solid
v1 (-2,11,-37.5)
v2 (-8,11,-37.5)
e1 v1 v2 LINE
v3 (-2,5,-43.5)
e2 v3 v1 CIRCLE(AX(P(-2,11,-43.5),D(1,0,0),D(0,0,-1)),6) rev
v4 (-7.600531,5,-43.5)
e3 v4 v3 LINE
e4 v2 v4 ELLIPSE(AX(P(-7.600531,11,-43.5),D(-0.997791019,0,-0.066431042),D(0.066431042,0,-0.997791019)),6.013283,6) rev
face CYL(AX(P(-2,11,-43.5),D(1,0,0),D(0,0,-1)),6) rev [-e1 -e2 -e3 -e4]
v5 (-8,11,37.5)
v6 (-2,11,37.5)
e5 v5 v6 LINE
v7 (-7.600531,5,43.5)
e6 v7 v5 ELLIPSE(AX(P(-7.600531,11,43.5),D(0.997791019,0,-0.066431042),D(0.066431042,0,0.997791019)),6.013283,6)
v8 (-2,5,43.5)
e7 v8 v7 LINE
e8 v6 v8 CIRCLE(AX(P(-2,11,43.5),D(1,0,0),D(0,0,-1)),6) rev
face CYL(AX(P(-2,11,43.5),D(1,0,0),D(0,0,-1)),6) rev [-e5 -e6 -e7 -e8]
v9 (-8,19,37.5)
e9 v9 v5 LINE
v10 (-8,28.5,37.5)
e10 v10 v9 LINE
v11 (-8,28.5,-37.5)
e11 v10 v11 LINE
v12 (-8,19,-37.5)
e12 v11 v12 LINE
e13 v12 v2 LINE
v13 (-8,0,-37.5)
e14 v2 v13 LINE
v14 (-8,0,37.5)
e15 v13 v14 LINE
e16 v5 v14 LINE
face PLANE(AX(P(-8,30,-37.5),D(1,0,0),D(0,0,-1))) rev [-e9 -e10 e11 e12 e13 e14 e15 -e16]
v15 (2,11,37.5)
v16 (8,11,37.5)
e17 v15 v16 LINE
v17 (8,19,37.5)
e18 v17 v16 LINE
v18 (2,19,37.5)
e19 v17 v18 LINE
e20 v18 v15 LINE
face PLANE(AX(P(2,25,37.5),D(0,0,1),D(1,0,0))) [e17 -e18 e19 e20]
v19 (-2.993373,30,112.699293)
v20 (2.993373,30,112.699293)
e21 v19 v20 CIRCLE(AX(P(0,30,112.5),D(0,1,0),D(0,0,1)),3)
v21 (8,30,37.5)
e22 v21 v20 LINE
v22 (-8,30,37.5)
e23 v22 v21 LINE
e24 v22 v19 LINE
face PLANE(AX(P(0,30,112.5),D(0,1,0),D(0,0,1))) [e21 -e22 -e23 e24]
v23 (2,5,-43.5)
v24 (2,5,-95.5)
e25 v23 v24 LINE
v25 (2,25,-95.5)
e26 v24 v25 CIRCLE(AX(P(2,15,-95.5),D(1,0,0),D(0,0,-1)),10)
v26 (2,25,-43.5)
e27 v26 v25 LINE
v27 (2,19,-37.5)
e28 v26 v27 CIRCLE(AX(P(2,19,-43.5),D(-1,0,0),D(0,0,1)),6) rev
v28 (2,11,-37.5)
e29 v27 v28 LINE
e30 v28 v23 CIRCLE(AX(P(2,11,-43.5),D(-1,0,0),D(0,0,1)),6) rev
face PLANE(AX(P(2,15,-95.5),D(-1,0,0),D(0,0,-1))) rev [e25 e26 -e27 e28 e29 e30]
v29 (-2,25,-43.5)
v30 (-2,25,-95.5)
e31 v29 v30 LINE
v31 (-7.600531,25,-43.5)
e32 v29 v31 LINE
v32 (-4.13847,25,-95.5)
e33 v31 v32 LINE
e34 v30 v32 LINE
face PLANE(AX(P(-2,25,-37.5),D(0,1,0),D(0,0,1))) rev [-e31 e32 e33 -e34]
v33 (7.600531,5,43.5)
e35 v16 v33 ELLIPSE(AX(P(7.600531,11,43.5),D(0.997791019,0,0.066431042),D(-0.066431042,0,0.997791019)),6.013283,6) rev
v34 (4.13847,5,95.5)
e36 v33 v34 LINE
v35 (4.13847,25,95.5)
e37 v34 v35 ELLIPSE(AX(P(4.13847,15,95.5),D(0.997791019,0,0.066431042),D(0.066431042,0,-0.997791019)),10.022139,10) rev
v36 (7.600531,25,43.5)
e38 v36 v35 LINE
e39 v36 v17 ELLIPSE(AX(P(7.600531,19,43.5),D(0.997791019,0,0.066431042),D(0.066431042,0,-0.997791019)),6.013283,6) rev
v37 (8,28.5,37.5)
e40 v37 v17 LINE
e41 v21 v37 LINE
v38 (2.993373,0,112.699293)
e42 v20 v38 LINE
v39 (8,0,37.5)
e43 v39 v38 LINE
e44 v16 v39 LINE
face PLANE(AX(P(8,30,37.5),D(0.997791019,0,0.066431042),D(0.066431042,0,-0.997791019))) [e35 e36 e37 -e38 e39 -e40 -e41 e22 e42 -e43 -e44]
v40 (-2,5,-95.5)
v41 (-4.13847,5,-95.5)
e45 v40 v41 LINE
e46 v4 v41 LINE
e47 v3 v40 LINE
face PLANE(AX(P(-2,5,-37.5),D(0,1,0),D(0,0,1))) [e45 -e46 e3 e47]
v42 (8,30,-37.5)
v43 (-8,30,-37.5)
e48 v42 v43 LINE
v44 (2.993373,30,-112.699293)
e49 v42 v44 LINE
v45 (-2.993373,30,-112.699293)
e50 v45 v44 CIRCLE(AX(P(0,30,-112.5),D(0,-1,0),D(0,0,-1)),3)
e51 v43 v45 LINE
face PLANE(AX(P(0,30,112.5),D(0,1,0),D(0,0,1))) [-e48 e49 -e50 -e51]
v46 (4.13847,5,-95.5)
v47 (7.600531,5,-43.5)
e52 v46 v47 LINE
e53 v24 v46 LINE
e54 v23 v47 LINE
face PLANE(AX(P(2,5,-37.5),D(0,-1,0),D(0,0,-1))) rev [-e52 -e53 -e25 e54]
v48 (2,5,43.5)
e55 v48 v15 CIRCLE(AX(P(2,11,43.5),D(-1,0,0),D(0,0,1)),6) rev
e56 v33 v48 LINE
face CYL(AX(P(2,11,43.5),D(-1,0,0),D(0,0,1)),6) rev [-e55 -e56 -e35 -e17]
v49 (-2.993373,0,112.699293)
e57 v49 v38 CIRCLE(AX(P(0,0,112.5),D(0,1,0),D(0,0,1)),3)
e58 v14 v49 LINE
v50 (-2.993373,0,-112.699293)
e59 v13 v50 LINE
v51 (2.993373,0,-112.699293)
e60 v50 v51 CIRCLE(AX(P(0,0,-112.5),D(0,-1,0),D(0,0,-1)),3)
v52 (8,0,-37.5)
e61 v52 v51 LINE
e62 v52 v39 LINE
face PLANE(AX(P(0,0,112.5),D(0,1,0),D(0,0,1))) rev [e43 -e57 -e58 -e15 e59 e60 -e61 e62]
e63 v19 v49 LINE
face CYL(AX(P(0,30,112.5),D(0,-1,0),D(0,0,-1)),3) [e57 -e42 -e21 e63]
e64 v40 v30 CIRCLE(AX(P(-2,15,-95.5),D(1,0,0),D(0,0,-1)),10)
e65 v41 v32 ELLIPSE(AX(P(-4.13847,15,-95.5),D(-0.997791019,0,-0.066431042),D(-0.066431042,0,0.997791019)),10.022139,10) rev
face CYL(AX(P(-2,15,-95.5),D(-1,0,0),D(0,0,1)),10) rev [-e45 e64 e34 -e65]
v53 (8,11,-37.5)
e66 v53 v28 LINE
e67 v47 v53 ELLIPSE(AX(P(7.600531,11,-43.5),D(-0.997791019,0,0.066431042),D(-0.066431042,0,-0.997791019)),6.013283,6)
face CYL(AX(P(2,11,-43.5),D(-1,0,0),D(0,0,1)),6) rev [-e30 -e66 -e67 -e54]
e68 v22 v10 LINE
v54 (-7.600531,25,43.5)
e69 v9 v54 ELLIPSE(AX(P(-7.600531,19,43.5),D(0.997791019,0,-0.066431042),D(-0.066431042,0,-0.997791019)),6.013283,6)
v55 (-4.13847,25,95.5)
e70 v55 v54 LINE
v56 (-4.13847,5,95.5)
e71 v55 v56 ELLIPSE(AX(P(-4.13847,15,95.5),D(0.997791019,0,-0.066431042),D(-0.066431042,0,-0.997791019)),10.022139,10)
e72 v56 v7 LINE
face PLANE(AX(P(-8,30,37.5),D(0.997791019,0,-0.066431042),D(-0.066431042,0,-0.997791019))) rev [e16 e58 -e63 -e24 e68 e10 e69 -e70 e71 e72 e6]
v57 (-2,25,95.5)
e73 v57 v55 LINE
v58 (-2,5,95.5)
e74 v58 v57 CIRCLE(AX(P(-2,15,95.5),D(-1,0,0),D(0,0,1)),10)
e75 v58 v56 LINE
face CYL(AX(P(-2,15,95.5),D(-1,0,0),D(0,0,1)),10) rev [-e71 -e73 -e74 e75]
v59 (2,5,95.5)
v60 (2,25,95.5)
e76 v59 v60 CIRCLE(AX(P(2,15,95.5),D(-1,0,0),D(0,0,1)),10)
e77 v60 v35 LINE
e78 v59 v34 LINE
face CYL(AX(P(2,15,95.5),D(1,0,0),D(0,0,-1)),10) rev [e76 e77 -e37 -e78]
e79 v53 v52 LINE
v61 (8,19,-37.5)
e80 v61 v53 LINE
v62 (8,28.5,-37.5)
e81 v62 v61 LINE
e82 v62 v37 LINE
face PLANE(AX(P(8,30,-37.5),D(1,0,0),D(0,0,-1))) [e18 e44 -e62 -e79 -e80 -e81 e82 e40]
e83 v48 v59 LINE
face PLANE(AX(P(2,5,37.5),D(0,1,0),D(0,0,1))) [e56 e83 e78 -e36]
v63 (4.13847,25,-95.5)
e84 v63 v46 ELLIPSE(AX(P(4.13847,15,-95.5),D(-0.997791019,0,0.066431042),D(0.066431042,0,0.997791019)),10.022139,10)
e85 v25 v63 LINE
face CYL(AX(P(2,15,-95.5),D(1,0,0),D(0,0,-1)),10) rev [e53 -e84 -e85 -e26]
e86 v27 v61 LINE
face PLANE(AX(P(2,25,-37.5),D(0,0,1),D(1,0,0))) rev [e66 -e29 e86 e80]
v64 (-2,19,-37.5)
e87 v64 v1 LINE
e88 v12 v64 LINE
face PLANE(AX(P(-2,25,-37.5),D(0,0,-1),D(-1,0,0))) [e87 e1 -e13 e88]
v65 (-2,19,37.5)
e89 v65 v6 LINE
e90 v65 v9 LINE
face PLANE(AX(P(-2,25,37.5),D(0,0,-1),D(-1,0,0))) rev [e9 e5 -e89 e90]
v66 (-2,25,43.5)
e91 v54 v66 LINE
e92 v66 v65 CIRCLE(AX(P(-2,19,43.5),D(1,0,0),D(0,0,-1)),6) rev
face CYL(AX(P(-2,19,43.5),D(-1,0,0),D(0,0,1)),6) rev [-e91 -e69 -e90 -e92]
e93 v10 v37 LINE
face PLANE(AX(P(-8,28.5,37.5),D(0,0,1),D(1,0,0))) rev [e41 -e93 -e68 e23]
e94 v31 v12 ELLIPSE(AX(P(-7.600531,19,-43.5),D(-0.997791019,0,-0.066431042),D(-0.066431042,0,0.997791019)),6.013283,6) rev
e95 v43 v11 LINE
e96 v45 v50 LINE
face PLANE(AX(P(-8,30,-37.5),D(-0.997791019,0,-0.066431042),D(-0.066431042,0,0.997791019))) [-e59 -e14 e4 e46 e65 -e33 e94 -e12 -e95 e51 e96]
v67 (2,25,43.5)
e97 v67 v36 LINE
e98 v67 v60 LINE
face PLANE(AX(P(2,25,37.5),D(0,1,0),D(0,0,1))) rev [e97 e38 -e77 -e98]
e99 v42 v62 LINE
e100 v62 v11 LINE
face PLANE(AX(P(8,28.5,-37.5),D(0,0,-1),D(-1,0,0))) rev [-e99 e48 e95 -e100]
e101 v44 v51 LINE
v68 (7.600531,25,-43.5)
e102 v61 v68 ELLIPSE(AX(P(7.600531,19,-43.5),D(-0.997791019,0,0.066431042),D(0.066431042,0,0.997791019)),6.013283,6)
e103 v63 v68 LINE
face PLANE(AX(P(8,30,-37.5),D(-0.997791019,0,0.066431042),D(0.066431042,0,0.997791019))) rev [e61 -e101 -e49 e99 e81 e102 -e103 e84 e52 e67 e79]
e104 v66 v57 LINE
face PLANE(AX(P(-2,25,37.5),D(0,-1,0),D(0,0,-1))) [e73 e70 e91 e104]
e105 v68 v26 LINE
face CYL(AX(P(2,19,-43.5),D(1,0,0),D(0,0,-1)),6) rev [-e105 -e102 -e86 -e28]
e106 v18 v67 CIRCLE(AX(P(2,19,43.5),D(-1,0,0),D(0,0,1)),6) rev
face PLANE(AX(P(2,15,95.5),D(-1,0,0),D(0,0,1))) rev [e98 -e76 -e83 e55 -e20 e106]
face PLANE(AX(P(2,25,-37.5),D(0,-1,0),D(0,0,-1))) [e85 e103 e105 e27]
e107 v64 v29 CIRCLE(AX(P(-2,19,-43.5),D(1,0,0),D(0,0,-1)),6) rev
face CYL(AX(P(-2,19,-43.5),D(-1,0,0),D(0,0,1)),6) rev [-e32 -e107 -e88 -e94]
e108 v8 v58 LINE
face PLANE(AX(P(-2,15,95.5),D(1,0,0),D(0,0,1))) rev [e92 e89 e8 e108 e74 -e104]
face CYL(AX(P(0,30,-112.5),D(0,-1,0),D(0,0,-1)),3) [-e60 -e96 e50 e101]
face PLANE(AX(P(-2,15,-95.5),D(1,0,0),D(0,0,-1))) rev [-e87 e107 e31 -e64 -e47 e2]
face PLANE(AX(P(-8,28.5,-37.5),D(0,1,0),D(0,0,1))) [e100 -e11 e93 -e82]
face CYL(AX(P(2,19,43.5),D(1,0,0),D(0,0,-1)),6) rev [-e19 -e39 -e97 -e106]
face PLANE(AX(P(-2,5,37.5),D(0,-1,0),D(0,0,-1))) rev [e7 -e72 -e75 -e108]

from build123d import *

# Parameters (mm, degrees)
BASE_EXTRUDE_DEPTH   = 30
CUT_EXTRUDE1_DEPTH   = 6
FILLET1_R            = 6
FILLET1_OF_MIRROR1_R = 6
MIRROR2_START        = -8
MIRROR2_DEPTH        = 6
MIRROR2_START_2      = 2
MIRROR2_2_DEPTH      = 6
SKETCH5_W            = 16
SKETCH5_H            = 75
CUT_EXTRUDE3_DEPTH   = 1.5


# Read off the part's stored shape, not the designer's step: Mirror2
with BuildPart() as part:
    # Sketch1 → Base-Extrude (new body)
    with BuildSketch(Plane(origin=(0, 0, 0), x_dir=(1, 0, 0), z_dir=(0, 1, 0))):
        with BuildLine():
            Line((8, 37.5), (2.993373056, 112.699293126))
            ThreePointArc((2.993373056, 112.699293126), (0, 115.5), (-2.993373056, 112.699293126))
            Line((-2.993373056, 112.699293126), (-8, 37.5))
            Line((-8, 37.5), (-8, -37.5))
            Line((-8, -37.5), (-2.993373056, -112.699293126))
            ThreePointArc((-2.993373056, -112.699293126), (0, -115.5), (2.993373056, -112.699293126))
            Line((2.993373056, -112.699293126), (8, -37.5))
            Line((8, -37.5), (8, 37.5))
        make_face()
    extrude(amount=BASE_EXTRUDE_DEPTH)

    # Sketch2 → Cut-Extrude1 (cut)
    with BuildSketch(Plane(origin=(8, 0, 0), x_dir=(0, 0, -1), z_dir=(1, 0, 0))):
        with BuildLine():
            Line((-37.5, 5), (-95.5, 5))
            ThreePointArc((-95.5, 5), (-105.5, 15), (-95.5, 25))
            Line((-95.5, 25), (-37.5, 25))
            Line((-37.5, 25), (-37.5, 5))
        make_face()
    cut_extrude1 = extrude(amount=-CUT_EXTRUDE1_DEPTH, mode=Mode.SUBTRACT)

    # Fillet1
    fillet1_edges = [part.edges().sort_by_distance(p)[0] for p in [
        (5, 25, 37.5),
        (5, 5, 37.5),
    ]]
    fillet(fillet1_edges, radius=FILLET1_R)

    # Mirror1: Cut-Extrude1 across plane
    add(cut_extrude1.mirror(Plane(origin=(0, 0, 0), x_dir=(0, 0, 1), z_dir=(1, 0, 0))), mode=Mode.SUBTRACT)

    # Fillet1 of Mirror1
    fillet1_of_mirror1_edges = [part.edges().sort_by_distance(p)[0] for p in [
        (-5, 25, 37.5),
        (-5, 5, 37.5),
    ]]
    fillet(fillet1_of_mirror1_edges, radius=FILLET1_OF_MIRROR1_R)

    # Mirror2 outline → Mirror2 (cut)
    with BuildSketch(Plane.YZ.offset(MIRROR2_START)):
        with BuildLine():
            Line((5, -43.5), (5, -95.5))
            ThreePointArc((5, -95.5), (15, -105.5), (25, -95.5))
            Line((25, -95.5), (25, -43.5))
            ThreePointArc((25, -43.5), (23.242640687, -39.257359313), (19, -37.5))
            Line((19, -37.5), (11, -37.5))
            ThreePointArc((11, -37.5), (6.757359313, -39.257359313), (5, -43.5))
        make_face()
    extrude(amount=MIRROR2_DEPTH, mode=Mode.SUBTRACT)

    # Mirror2 2 outline → Mirror2 2 (cut)
    with BuildSketch(Plane.YZ.offset(MIRROR2_START_2)):
        with BuildLine():
            Line((5, -43.5), (5, -95.5))
            ThreePointArc((5, -95.5), (15, -105.5), (25, -95.5))
            Line((25, -95.5), (25, -43.5))
            ThreePointArc((25, -43.5), (23.242640687, -39.257359313), (19, -37.5))
            Line((19, -37.5), (11, -37.5))
            ThreePointArc((11, -37.5), (6.757359313, -39.257359313), (5, -43.5))
        make_face()
    extrude(amount=MIRROR2_2_DEPTH, mode=Mode.SUBTRACT)

    # Sketch5 → Cut-Extrude3 (cut)
    with BuildSketch(Plane(origin=(0, 30, 0), x_dir=(-1, 0, 0), z_dir=(0, 1, 0))):
        Rectangle(SKETCH5_W, SKETCH5_H)
    extrude(amount=-CUT_EXTRUDE3_DEPTH, mode=Mode.SUBTRACT)


solid = part.part
